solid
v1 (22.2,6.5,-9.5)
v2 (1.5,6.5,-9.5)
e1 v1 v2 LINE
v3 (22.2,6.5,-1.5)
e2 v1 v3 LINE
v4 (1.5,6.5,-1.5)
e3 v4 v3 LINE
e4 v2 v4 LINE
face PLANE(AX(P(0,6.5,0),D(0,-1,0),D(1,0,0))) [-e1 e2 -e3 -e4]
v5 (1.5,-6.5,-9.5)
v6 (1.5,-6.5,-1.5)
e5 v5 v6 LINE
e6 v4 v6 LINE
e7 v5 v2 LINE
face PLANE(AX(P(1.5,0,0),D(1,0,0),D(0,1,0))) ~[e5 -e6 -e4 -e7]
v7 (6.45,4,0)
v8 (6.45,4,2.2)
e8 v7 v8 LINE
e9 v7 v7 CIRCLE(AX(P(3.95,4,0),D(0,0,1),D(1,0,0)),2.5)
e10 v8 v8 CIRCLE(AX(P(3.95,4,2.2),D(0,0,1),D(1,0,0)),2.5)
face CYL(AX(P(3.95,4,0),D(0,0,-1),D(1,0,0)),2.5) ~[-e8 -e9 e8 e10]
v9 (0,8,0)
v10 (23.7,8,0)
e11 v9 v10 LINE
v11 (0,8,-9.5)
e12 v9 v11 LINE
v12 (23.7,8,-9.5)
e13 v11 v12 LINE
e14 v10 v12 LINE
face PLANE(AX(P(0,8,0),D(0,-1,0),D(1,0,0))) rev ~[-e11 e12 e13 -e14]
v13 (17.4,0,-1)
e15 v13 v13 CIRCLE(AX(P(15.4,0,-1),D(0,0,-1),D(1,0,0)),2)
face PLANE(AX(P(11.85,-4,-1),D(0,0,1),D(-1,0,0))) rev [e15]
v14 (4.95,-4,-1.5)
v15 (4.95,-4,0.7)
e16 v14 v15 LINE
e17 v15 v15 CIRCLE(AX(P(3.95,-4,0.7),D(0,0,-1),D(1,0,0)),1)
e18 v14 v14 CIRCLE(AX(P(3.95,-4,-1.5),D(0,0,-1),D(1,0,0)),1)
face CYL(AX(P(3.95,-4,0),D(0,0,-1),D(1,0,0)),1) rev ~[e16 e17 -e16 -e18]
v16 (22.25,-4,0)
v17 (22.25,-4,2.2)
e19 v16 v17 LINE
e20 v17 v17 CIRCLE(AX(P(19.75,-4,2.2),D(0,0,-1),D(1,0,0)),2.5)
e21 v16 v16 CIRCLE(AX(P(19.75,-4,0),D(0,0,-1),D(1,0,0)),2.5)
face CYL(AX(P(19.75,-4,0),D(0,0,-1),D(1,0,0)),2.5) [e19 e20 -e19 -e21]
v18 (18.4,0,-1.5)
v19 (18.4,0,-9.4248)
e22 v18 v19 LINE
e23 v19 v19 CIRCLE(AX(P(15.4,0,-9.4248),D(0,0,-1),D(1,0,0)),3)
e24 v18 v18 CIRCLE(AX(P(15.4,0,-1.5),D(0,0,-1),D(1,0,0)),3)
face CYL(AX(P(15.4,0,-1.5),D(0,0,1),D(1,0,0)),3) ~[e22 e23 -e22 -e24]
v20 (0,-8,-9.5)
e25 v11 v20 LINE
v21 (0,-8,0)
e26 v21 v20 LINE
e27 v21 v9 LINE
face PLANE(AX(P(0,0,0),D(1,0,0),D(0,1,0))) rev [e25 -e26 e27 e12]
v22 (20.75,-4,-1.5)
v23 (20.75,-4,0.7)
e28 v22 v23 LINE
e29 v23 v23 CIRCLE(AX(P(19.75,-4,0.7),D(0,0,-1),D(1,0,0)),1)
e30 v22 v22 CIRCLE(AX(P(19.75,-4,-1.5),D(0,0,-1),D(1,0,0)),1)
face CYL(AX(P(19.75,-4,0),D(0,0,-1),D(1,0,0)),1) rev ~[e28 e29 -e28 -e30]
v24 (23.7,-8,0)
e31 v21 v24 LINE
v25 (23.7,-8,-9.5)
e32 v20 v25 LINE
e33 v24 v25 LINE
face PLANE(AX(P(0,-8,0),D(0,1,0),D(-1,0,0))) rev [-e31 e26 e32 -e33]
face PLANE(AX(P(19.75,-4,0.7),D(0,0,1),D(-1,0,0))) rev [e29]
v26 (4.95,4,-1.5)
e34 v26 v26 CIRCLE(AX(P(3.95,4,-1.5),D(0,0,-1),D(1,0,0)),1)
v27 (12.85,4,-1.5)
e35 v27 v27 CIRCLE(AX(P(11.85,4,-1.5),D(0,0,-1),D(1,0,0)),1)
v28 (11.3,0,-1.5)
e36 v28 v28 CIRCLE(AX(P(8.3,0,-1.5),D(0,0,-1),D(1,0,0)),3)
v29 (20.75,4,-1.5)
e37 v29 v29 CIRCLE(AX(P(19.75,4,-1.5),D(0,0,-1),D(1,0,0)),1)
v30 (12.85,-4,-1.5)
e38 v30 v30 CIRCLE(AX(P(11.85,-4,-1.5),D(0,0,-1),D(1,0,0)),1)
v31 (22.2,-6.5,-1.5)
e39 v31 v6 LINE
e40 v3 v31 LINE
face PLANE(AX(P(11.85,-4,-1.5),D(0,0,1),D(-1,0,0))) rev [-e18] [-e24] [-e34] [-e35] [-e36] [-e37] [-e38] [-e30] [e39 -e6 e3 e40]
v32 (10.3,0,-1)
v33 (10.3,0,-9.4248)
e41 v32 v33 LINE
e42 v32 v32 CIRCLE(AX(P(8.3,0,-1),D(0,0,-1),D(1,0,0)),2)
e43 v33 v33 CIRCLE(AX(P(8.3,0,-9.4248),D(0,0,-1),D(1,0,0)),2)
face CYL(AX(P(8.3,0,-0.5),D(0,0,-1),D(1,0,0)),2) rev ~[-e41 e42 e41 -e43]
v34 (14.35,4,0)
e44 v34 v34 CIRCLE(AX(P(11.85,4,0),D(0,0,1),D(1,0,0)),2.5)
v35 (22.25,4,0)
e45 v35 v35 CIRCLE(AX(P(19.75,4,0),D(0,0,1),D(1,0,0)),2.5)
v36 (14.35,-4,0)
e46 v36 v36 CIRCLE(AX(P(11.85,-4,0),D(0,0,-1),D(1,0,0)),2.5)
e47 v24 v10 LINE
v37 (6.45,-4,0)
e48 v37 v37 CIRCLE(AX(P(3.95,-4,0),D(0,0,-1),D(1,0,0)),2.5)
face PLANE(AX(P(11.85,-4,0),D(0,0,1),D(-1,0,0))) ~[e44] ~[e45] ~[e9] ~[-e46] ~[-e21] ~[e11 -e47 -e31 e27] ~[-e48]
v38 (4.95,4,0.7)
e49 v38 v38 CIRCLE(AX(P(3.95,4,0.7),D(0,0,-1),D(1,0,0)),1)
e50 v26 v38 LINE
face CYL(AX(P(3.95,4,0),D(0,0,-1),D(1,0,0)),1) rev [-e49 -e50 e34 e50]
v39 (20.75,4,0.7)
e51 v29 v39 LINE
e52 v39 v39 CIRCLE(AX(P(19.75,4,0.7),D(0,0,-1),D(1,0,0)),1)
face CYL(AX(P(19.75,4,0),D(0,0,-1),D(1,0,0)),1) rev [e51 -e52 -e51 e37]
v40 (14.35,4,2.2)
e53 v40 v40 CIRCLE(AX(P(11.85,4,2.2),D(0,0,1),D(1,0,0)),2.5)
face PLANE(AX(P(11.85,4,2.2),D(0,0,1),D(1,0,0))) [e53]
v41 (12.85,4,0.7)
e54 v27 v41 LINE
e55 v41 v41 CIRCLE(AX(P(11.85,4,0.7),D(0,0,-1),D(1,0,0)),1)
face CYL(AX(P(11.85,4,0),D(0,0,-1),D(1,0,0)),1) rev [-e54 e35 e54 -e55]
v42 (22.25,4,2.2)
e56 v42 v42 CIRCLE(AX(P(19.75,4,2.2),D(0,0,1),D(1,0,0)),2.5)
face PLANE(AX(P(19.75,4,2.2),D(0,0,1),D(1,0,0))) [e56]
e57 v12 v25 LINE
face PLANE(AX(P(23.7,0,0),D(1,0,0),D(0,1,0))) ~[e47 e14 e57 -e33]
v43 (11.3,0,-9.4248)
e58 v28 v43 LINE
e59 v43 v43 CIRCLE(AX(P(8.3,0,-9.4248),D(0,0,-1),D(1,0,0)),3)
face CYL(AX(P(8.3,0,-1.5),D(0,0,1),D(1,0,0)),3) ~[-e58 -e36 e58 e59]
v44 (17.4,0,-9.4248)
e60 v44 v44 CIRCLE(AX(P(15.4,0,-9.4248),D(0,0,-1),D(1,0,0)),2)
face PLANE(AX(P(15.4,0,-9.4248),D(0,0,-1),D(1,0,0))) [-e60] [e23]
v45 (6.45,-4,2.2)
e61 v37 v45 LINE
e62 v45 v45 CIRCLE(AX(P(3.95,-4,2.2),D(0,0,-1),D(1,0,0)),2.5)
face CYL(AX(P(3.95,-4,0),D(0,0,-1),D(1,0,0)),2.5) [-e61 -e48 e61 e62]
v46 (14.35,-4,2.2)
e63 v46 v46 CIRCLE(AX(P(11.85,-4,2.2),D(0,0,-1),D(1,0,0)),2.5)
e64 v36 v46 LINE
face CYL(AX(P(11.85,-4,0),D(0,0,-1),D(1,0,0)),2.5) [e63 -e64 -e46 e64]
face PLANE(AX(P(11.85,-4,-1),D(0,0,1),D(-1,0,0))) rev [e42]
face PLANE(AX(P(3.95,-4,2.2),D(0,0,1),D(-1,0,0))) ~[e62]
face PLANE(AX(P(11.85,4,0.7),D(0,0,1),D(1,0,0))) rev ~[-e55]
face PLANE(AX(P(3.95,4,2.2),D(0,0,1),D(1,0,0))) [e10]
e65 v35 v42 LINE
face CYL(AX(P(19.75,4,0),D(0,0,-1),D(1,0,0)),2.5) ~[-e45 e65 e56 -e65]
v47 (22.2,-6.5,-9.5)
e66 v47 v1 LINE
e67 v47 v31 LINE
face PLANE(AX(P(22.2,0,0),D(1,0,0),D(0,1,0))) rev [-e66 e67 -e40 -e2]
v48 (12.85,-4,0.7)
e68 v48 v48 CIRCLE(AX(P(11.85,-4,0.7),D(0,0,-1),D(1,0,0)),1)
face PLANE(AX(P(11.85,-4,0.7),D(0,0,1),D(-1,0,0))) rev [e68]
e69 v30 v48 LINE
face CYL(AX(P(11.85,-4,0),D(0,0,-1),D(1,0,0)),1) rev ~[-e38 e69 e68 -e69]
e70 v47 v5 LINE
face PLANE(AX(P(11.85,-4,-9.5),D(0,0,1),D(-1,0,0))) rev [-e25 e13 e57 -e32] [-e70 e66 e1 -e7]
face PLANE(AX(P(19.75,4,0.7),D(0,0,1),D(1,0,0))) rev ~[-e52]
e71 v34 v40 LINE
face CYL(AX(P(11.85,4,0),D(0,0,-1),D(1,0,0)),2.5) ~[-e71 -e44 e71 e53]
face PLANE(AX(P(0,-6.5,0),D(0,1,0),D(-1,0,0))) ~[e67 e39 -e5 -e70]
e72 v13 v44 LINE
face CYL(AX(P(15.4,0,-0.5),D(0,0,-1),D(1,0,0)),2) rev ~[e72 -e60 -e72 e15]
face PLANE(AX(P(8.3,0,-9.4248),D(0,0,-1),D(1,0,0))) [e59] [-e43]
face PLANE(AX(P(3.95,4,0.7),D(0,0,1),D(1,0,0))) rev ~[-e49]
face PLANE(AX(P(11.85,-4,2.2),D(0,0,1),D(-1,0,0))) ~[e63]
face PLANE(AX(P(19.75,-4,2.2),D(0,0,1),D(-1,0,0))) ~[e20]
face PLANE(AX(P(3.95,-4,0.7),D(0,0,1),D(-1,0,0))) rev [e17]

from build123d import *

# Parameters (mm, degrees)
F0_W        = 23.7
F0_H        = 8
F0_R        = 2.5
F1_DEPTH    = 9.5
F2_DEPTH    = 2.2
F4_T        = -1.5
F5_R        = 3
F6_DEPTH    = 7.9248
F7_T        = 1
F7_T3_DEPTH = 10
F7_T5_DEPTH = 15
F7_T7_DEPTH = 22.7


# Not quite as in the source:
# - a shell that OpenCascade refuses in one call is made with other operations: the cavity is built on its own and cut out


with BuildPart() as f1:
    # F0 (on Top) → F1 (new body)
    with BuildSketch(Plane.XY):
        with Locations((11.85, 4)):
            Rectangle(F0_W, F0_H)
        with Locations((3.95, 4)):
            Circle(F0_R, mode=Mode.SUBTRACT)
        with Locations((11.85, 4)):
            Circle(F0_R, mode=Mode.SUBTRACT)
        with Locations((19.75, 4)):
            Circle(F0_R, mode=Mode.SUBTRACT)
        with Locations((19.75, 4)):
            Circle(F0_R)
        with Locations((11.85, 4)):
            Circle(F0_R)
        with Locations((3.95, 4)):
            Circle(F0_R)
    extrude(amount=-F1_DEPTH)

    # F0 (on Top) → F2 (join)
    with BuildSketch(Plane.XY):
        with Locations((3.95, 4)):
            Circle(F0_R)
        with Locations((11.85, 4)):
            Circle(F0_R)
        with Locations((19.75, 4)):
            Circle(F0_R)
    extrude(amount=F2_DEPTH)

    # F3: F1 across face


with BuildPart() as f1_1:
    add(f1.part)
    add(f1.part.mirror(Plane(origin=(11.85, 0, -4.75), x_dir=(1, 0, 0), z_dir=(0, -1, 0))))

    # F4
    f4_openings = [f1_1.faces().sort_by_distance(p)[0] for p in [
        (11.85, 0, -9.5),
    ]]
    offset(amount=F4_T, openings=f4_openings, kind=Kind.INTERSECTION)

    # F5 (on face) → F6 (join)
    with BuildSketch(Plane(origin=(0, 0, -1.5), x_dir=(1, 0, 0), z_dir=(0, 0, -1))):
        with Locations((8.3, 0)):
            Circle(F5_R)
        with Locations((15.4, 0)):
            Circle(F5_R)
    extrude(amount=F6_DEPTH)

    # F7: shell of thickness 1, made by hand


with BuildPart() as f7_core1:
    # F7_t2: copy of F1
    add(f1_1.part)

    # the walls: a layer under each face that stays
    f7_faces = [f7_core1.faces().sort_by_distance(p)[0] for p in [
        (0, 0, -4.75),
        (11.85, 8, -4.75),
        (1.6928571429, -6.8571428571, -9.5),
        (11.85, -8, -4.75),
        (11.85, 0, 0),
        (23.7, 0, -4.75),
        (1.5, 0, -5.5),
        (11.85, 6.5, -5.5),
        (22.2, 0, -5.5),
        (11.85, -6.5, -5.5),
        (1.45, 4, 1.1),
        (9.35, 4, 1.1),
        (17.25, 4, 1.1),
        (17.25, -4, 1.1),
        (1.45, -4, 1.1),
        (9.35, -4, 1.1),
        (11.85, 0, -1.5),
        (3.95, 4, 2.2),
        (11.85, 4, 2.2),
        (19.75, 4, 2.2),
        (19.75, -4, 2.2),
        (3.95, -4, 2.2),
        (11.85, -4, 2.2),
        (2.95, -4, -0.4),
        (10.85, -4, -0.4),
        (18.75, -4, -0.4),
        (5.3, 0, -5.4624),
        (2.95, 4, -0.4),
        (12.4, 0, -5.4624),
        (10.85, 4, -0.4),
        (18.75, 4, -0.4),
        (3.95, -4, 0.7),
        (11.85, -4, 0.7),
        (19.75, -4, 0.7),
        (3.95, 4, 0.7),
        (11.85, 4, 0.7),
        (19.75, 4, 0.7),
    ]]
    thicken(f7_faces, amount=-F7_T, mode=Mode.SUBTRACT)

    # F7_s4 → F7_t3 (cut)
    with BuildSketch(Plane.XY.offset(-10.5)):
        Polygon((1.51, 6.49), (0.5, 6.5), (0.5, 7.5), (1.5, 7.5), align=None)
        Polygon((1.51, -6.49), (0.5, -6.5), (0.5, -7.5), (1.5, -7.5), align=None)
        Polygon((22.19, 6.49), (22.2, 7.5), (23.2, 7.5), (23.2, 6.5), align=None)
        Polygon((22.19, -6.49), (23.2, -6.5), (23.2, -7.5), (22.2, -7.5), align=None)
    extrude(amount=F7_T3_DEPTH, mode=Mode.SUBTRACT)

    # F7_s6 → F7_t5 (cut)
    with BuildSketch(Plane.XZ.offset(-7.5)):
        Polygon((1.51, -1.51), (0.5, -1.5), (0.5, -0.5), (1.5, -0.5), align=None)
        Polygon((22.19, -1.51), (23.2, -1.5), (23.2, -0.5), (22.2, -0.5), align=None)
    extrude(amount=F7_T5_DEPTH, mode=Mode.SUBTRACT)

    # F7_s8 → F7_t7 (cut)
    with BuildSketch(Plane.YZ.offset(0.5)):
        Polygon((6.49, -1.51), (7.5, -1.5), (7.5, -0.5), (6.5, -0.5), align=None)
        Polygon((-6.49, -1.51), (-7.5, -1.5), (-7.5, -0.5), (-6.5, -0.5), align=None)
    extrude(amount=F7_T7_DEPTH, mode=Mode.SUBTRACT)

    # F7_s9 → F7_t10 (revolve, cut)
    with BuildSketch(Plane.XZ.offset(-4)):
        Polygon((6.46, 0.01), (6.45, -1), (5.45, -1), (5.45, 0), align=None)
    revolve(axis=Axis((3.95, 4, 0), (0, 0, 1)), mode=Mode.SUBTRACT)

    # F7_s11 → F7_t12 (revolve, cut)
    with BuildSketch(Plane.XZ.offset(-4)):
        Polygon((14.36, 0.01), (14.35, -1), (13.35, -1), (13.35, 0), align=None)
    revolve(axis=Axis((11.85, 4, 0), (0, 0, 1)), mode=Mode.SUBTRACT)

    # F7_s13 → F7_t14 (revolve, cut)
    with BuildSketch(Plane.XZ.offset(-4)):
        Polygon((22.26, 0.01), (22.25, -1), (21.25, -1), (21.25, 0), align=None)
    revolve(axis=Axis((19.75, 4, 0), (0, 0, 1)), mode=Mode.SUBTRACT)

    # F7_s15 → F7_t16 (revolve, cut)
    with BuildSketch(Plane.XZ.offset(4)):
        Polygon((22.26, 0.01), (22.25, -1), (21.25, -1), (21.25, 0), align=None)
    revolve(axis=Axis((19.75, -4, 0), (0, 0, -1)), mode=Mode.SUBTRACT)

    # F7_s17 → F7_t18 (revolve, cut)
    with BuildSketch(Plane.XZ.offset(4)):
        Polygon((6.46, 0.01), (6.45, -1), (5.45, -1), (5.45, 0), align=None)
    revolve(axis=Axis((3.95, -4, 0), (0, 0, -1)), mode=Mode.SUBTRACT)

    # F7_s19 → F7_t20 (revolve, cut)
    with BuildSketch(Plane.XZ.offset(4)):
        Polygon((14.36, 0.01), (14.35, -1), (13.35, -1), (13.35, 0), align=None)
    revolve(axis=Axis((11.85, -4, 0), (0, 0, -1)), mode=Mode.SUBTRACT)

    # F7_s21 → F7_t22 (revolve, cut)
    with BuildSketch(Plane.XZ):
        Polygon((11.31, -1.51), (11.3, -0.5), (10.3, -0.5), (10.3, -1.5), align=None)
    revolve(axis=Axis((8.3, 0, -1.5), (0, 0, -1)), mode=Mode.SUBTRACT)

    # F7_s23 → F7_t24 (revolve, cut)
    with BuildSketch(Plane.XZ):
        Polygon((18.41, -1.51), (18.4, -0.5), (17.4, -0.5), (17.4, -1.5), align=None)
    revolve(axis=Axis((15.4, 0, -1.5), (0, 0, -1)), mode=Mode.SUBTRACT)

    # F7_s25 → F7_t26 (revolve, cut)
    with BuildSketch(Plane.XZ.offset(4)):
        Polygon((4.94, 0.69), (5.95, 0.7), (5.95, 1.7), (4.95, 1.7), align=None)
    revolve(axis=Axis((3.95, -4, 0.7), (0, 0, -1)), mode=Mode.SUBTRACT)

    # F7_s27 → F7_t28 (revolve, cut)
    with BuildSketch(Plane.XZ.offset(4)):
        Polygon((12.84, 0.69), (13.85, 0.7), (13.85, 1.7), (12.85, 1.7), align=None)
    revolve(axis=Axis((11.85, -4, 0.7), (0, 0, -1)), mode=Mode.SUBTRACT)

    # F7_s29 → F7_t30 (revolve, cut)
    with BuildSketch(Plane.XZ.offset(4)):
        Polygon((20.74, 0.69), (21.75, 0.7), (21.75, 1.7), (20.75, 1.7), align=None)
    revolve(axis=Axis((19.75, -4, 0.7), (0, 0, -1)), mode=Mode.SUBTRACT)

    # F7_s31 → F7_t32 (revolve, cut)
    with BuildSketch(Plane.XZ.offset(-4)):
        Polygon((4.94, 0.69), (5.95, 0.7), (5.95, 1.7), (4.95, 1.7), align=None)
    revolve(axis=Axis((3.95, 4, 0.7), (0, 0, -1)), mode=Mode.SUBTRACT)

    # F7_s33 → F7_t34 (revolve, cut)
    with BuildSketch(Plane.XZ.offset(-4)):
        Polygon((12.84, 0.69), (13.85, 0.7), (13.85, 1.7), (12.85, 1.7), align=None)
    revolve(axis=Axis((11.85, 4, 0.7), (0, 0, -1)), mode=Mode.SUBTRACT)

    # F7_s35 → F7_t36 (revolve, cut)
    with BuildSketch(Plane.XZ.offset(-4)):
        Polygon((20.74, 0.69), (21.75, 0.7), (21.75, 1.7), (20.75, 1.7), align=None)
    revolve(axis=Axis((19.75, 4, 0.7), (0, 0, -1)), mode=Mode.SUBTRACT)


with BuildPart() as f1_2:
    add(f1_1.part)

    # what is left inside the walls is the cavity
    f7_cavity = [f7_core1.part.solids().sort_by_distance(p)[0] for p in [
        (13.41, 0, -3.808267),
        (6.31, 0, -3.808267),
    ]]
    add(f7_cavity, mode=Mode.SUBTRACT)


solid = f1_2.part
